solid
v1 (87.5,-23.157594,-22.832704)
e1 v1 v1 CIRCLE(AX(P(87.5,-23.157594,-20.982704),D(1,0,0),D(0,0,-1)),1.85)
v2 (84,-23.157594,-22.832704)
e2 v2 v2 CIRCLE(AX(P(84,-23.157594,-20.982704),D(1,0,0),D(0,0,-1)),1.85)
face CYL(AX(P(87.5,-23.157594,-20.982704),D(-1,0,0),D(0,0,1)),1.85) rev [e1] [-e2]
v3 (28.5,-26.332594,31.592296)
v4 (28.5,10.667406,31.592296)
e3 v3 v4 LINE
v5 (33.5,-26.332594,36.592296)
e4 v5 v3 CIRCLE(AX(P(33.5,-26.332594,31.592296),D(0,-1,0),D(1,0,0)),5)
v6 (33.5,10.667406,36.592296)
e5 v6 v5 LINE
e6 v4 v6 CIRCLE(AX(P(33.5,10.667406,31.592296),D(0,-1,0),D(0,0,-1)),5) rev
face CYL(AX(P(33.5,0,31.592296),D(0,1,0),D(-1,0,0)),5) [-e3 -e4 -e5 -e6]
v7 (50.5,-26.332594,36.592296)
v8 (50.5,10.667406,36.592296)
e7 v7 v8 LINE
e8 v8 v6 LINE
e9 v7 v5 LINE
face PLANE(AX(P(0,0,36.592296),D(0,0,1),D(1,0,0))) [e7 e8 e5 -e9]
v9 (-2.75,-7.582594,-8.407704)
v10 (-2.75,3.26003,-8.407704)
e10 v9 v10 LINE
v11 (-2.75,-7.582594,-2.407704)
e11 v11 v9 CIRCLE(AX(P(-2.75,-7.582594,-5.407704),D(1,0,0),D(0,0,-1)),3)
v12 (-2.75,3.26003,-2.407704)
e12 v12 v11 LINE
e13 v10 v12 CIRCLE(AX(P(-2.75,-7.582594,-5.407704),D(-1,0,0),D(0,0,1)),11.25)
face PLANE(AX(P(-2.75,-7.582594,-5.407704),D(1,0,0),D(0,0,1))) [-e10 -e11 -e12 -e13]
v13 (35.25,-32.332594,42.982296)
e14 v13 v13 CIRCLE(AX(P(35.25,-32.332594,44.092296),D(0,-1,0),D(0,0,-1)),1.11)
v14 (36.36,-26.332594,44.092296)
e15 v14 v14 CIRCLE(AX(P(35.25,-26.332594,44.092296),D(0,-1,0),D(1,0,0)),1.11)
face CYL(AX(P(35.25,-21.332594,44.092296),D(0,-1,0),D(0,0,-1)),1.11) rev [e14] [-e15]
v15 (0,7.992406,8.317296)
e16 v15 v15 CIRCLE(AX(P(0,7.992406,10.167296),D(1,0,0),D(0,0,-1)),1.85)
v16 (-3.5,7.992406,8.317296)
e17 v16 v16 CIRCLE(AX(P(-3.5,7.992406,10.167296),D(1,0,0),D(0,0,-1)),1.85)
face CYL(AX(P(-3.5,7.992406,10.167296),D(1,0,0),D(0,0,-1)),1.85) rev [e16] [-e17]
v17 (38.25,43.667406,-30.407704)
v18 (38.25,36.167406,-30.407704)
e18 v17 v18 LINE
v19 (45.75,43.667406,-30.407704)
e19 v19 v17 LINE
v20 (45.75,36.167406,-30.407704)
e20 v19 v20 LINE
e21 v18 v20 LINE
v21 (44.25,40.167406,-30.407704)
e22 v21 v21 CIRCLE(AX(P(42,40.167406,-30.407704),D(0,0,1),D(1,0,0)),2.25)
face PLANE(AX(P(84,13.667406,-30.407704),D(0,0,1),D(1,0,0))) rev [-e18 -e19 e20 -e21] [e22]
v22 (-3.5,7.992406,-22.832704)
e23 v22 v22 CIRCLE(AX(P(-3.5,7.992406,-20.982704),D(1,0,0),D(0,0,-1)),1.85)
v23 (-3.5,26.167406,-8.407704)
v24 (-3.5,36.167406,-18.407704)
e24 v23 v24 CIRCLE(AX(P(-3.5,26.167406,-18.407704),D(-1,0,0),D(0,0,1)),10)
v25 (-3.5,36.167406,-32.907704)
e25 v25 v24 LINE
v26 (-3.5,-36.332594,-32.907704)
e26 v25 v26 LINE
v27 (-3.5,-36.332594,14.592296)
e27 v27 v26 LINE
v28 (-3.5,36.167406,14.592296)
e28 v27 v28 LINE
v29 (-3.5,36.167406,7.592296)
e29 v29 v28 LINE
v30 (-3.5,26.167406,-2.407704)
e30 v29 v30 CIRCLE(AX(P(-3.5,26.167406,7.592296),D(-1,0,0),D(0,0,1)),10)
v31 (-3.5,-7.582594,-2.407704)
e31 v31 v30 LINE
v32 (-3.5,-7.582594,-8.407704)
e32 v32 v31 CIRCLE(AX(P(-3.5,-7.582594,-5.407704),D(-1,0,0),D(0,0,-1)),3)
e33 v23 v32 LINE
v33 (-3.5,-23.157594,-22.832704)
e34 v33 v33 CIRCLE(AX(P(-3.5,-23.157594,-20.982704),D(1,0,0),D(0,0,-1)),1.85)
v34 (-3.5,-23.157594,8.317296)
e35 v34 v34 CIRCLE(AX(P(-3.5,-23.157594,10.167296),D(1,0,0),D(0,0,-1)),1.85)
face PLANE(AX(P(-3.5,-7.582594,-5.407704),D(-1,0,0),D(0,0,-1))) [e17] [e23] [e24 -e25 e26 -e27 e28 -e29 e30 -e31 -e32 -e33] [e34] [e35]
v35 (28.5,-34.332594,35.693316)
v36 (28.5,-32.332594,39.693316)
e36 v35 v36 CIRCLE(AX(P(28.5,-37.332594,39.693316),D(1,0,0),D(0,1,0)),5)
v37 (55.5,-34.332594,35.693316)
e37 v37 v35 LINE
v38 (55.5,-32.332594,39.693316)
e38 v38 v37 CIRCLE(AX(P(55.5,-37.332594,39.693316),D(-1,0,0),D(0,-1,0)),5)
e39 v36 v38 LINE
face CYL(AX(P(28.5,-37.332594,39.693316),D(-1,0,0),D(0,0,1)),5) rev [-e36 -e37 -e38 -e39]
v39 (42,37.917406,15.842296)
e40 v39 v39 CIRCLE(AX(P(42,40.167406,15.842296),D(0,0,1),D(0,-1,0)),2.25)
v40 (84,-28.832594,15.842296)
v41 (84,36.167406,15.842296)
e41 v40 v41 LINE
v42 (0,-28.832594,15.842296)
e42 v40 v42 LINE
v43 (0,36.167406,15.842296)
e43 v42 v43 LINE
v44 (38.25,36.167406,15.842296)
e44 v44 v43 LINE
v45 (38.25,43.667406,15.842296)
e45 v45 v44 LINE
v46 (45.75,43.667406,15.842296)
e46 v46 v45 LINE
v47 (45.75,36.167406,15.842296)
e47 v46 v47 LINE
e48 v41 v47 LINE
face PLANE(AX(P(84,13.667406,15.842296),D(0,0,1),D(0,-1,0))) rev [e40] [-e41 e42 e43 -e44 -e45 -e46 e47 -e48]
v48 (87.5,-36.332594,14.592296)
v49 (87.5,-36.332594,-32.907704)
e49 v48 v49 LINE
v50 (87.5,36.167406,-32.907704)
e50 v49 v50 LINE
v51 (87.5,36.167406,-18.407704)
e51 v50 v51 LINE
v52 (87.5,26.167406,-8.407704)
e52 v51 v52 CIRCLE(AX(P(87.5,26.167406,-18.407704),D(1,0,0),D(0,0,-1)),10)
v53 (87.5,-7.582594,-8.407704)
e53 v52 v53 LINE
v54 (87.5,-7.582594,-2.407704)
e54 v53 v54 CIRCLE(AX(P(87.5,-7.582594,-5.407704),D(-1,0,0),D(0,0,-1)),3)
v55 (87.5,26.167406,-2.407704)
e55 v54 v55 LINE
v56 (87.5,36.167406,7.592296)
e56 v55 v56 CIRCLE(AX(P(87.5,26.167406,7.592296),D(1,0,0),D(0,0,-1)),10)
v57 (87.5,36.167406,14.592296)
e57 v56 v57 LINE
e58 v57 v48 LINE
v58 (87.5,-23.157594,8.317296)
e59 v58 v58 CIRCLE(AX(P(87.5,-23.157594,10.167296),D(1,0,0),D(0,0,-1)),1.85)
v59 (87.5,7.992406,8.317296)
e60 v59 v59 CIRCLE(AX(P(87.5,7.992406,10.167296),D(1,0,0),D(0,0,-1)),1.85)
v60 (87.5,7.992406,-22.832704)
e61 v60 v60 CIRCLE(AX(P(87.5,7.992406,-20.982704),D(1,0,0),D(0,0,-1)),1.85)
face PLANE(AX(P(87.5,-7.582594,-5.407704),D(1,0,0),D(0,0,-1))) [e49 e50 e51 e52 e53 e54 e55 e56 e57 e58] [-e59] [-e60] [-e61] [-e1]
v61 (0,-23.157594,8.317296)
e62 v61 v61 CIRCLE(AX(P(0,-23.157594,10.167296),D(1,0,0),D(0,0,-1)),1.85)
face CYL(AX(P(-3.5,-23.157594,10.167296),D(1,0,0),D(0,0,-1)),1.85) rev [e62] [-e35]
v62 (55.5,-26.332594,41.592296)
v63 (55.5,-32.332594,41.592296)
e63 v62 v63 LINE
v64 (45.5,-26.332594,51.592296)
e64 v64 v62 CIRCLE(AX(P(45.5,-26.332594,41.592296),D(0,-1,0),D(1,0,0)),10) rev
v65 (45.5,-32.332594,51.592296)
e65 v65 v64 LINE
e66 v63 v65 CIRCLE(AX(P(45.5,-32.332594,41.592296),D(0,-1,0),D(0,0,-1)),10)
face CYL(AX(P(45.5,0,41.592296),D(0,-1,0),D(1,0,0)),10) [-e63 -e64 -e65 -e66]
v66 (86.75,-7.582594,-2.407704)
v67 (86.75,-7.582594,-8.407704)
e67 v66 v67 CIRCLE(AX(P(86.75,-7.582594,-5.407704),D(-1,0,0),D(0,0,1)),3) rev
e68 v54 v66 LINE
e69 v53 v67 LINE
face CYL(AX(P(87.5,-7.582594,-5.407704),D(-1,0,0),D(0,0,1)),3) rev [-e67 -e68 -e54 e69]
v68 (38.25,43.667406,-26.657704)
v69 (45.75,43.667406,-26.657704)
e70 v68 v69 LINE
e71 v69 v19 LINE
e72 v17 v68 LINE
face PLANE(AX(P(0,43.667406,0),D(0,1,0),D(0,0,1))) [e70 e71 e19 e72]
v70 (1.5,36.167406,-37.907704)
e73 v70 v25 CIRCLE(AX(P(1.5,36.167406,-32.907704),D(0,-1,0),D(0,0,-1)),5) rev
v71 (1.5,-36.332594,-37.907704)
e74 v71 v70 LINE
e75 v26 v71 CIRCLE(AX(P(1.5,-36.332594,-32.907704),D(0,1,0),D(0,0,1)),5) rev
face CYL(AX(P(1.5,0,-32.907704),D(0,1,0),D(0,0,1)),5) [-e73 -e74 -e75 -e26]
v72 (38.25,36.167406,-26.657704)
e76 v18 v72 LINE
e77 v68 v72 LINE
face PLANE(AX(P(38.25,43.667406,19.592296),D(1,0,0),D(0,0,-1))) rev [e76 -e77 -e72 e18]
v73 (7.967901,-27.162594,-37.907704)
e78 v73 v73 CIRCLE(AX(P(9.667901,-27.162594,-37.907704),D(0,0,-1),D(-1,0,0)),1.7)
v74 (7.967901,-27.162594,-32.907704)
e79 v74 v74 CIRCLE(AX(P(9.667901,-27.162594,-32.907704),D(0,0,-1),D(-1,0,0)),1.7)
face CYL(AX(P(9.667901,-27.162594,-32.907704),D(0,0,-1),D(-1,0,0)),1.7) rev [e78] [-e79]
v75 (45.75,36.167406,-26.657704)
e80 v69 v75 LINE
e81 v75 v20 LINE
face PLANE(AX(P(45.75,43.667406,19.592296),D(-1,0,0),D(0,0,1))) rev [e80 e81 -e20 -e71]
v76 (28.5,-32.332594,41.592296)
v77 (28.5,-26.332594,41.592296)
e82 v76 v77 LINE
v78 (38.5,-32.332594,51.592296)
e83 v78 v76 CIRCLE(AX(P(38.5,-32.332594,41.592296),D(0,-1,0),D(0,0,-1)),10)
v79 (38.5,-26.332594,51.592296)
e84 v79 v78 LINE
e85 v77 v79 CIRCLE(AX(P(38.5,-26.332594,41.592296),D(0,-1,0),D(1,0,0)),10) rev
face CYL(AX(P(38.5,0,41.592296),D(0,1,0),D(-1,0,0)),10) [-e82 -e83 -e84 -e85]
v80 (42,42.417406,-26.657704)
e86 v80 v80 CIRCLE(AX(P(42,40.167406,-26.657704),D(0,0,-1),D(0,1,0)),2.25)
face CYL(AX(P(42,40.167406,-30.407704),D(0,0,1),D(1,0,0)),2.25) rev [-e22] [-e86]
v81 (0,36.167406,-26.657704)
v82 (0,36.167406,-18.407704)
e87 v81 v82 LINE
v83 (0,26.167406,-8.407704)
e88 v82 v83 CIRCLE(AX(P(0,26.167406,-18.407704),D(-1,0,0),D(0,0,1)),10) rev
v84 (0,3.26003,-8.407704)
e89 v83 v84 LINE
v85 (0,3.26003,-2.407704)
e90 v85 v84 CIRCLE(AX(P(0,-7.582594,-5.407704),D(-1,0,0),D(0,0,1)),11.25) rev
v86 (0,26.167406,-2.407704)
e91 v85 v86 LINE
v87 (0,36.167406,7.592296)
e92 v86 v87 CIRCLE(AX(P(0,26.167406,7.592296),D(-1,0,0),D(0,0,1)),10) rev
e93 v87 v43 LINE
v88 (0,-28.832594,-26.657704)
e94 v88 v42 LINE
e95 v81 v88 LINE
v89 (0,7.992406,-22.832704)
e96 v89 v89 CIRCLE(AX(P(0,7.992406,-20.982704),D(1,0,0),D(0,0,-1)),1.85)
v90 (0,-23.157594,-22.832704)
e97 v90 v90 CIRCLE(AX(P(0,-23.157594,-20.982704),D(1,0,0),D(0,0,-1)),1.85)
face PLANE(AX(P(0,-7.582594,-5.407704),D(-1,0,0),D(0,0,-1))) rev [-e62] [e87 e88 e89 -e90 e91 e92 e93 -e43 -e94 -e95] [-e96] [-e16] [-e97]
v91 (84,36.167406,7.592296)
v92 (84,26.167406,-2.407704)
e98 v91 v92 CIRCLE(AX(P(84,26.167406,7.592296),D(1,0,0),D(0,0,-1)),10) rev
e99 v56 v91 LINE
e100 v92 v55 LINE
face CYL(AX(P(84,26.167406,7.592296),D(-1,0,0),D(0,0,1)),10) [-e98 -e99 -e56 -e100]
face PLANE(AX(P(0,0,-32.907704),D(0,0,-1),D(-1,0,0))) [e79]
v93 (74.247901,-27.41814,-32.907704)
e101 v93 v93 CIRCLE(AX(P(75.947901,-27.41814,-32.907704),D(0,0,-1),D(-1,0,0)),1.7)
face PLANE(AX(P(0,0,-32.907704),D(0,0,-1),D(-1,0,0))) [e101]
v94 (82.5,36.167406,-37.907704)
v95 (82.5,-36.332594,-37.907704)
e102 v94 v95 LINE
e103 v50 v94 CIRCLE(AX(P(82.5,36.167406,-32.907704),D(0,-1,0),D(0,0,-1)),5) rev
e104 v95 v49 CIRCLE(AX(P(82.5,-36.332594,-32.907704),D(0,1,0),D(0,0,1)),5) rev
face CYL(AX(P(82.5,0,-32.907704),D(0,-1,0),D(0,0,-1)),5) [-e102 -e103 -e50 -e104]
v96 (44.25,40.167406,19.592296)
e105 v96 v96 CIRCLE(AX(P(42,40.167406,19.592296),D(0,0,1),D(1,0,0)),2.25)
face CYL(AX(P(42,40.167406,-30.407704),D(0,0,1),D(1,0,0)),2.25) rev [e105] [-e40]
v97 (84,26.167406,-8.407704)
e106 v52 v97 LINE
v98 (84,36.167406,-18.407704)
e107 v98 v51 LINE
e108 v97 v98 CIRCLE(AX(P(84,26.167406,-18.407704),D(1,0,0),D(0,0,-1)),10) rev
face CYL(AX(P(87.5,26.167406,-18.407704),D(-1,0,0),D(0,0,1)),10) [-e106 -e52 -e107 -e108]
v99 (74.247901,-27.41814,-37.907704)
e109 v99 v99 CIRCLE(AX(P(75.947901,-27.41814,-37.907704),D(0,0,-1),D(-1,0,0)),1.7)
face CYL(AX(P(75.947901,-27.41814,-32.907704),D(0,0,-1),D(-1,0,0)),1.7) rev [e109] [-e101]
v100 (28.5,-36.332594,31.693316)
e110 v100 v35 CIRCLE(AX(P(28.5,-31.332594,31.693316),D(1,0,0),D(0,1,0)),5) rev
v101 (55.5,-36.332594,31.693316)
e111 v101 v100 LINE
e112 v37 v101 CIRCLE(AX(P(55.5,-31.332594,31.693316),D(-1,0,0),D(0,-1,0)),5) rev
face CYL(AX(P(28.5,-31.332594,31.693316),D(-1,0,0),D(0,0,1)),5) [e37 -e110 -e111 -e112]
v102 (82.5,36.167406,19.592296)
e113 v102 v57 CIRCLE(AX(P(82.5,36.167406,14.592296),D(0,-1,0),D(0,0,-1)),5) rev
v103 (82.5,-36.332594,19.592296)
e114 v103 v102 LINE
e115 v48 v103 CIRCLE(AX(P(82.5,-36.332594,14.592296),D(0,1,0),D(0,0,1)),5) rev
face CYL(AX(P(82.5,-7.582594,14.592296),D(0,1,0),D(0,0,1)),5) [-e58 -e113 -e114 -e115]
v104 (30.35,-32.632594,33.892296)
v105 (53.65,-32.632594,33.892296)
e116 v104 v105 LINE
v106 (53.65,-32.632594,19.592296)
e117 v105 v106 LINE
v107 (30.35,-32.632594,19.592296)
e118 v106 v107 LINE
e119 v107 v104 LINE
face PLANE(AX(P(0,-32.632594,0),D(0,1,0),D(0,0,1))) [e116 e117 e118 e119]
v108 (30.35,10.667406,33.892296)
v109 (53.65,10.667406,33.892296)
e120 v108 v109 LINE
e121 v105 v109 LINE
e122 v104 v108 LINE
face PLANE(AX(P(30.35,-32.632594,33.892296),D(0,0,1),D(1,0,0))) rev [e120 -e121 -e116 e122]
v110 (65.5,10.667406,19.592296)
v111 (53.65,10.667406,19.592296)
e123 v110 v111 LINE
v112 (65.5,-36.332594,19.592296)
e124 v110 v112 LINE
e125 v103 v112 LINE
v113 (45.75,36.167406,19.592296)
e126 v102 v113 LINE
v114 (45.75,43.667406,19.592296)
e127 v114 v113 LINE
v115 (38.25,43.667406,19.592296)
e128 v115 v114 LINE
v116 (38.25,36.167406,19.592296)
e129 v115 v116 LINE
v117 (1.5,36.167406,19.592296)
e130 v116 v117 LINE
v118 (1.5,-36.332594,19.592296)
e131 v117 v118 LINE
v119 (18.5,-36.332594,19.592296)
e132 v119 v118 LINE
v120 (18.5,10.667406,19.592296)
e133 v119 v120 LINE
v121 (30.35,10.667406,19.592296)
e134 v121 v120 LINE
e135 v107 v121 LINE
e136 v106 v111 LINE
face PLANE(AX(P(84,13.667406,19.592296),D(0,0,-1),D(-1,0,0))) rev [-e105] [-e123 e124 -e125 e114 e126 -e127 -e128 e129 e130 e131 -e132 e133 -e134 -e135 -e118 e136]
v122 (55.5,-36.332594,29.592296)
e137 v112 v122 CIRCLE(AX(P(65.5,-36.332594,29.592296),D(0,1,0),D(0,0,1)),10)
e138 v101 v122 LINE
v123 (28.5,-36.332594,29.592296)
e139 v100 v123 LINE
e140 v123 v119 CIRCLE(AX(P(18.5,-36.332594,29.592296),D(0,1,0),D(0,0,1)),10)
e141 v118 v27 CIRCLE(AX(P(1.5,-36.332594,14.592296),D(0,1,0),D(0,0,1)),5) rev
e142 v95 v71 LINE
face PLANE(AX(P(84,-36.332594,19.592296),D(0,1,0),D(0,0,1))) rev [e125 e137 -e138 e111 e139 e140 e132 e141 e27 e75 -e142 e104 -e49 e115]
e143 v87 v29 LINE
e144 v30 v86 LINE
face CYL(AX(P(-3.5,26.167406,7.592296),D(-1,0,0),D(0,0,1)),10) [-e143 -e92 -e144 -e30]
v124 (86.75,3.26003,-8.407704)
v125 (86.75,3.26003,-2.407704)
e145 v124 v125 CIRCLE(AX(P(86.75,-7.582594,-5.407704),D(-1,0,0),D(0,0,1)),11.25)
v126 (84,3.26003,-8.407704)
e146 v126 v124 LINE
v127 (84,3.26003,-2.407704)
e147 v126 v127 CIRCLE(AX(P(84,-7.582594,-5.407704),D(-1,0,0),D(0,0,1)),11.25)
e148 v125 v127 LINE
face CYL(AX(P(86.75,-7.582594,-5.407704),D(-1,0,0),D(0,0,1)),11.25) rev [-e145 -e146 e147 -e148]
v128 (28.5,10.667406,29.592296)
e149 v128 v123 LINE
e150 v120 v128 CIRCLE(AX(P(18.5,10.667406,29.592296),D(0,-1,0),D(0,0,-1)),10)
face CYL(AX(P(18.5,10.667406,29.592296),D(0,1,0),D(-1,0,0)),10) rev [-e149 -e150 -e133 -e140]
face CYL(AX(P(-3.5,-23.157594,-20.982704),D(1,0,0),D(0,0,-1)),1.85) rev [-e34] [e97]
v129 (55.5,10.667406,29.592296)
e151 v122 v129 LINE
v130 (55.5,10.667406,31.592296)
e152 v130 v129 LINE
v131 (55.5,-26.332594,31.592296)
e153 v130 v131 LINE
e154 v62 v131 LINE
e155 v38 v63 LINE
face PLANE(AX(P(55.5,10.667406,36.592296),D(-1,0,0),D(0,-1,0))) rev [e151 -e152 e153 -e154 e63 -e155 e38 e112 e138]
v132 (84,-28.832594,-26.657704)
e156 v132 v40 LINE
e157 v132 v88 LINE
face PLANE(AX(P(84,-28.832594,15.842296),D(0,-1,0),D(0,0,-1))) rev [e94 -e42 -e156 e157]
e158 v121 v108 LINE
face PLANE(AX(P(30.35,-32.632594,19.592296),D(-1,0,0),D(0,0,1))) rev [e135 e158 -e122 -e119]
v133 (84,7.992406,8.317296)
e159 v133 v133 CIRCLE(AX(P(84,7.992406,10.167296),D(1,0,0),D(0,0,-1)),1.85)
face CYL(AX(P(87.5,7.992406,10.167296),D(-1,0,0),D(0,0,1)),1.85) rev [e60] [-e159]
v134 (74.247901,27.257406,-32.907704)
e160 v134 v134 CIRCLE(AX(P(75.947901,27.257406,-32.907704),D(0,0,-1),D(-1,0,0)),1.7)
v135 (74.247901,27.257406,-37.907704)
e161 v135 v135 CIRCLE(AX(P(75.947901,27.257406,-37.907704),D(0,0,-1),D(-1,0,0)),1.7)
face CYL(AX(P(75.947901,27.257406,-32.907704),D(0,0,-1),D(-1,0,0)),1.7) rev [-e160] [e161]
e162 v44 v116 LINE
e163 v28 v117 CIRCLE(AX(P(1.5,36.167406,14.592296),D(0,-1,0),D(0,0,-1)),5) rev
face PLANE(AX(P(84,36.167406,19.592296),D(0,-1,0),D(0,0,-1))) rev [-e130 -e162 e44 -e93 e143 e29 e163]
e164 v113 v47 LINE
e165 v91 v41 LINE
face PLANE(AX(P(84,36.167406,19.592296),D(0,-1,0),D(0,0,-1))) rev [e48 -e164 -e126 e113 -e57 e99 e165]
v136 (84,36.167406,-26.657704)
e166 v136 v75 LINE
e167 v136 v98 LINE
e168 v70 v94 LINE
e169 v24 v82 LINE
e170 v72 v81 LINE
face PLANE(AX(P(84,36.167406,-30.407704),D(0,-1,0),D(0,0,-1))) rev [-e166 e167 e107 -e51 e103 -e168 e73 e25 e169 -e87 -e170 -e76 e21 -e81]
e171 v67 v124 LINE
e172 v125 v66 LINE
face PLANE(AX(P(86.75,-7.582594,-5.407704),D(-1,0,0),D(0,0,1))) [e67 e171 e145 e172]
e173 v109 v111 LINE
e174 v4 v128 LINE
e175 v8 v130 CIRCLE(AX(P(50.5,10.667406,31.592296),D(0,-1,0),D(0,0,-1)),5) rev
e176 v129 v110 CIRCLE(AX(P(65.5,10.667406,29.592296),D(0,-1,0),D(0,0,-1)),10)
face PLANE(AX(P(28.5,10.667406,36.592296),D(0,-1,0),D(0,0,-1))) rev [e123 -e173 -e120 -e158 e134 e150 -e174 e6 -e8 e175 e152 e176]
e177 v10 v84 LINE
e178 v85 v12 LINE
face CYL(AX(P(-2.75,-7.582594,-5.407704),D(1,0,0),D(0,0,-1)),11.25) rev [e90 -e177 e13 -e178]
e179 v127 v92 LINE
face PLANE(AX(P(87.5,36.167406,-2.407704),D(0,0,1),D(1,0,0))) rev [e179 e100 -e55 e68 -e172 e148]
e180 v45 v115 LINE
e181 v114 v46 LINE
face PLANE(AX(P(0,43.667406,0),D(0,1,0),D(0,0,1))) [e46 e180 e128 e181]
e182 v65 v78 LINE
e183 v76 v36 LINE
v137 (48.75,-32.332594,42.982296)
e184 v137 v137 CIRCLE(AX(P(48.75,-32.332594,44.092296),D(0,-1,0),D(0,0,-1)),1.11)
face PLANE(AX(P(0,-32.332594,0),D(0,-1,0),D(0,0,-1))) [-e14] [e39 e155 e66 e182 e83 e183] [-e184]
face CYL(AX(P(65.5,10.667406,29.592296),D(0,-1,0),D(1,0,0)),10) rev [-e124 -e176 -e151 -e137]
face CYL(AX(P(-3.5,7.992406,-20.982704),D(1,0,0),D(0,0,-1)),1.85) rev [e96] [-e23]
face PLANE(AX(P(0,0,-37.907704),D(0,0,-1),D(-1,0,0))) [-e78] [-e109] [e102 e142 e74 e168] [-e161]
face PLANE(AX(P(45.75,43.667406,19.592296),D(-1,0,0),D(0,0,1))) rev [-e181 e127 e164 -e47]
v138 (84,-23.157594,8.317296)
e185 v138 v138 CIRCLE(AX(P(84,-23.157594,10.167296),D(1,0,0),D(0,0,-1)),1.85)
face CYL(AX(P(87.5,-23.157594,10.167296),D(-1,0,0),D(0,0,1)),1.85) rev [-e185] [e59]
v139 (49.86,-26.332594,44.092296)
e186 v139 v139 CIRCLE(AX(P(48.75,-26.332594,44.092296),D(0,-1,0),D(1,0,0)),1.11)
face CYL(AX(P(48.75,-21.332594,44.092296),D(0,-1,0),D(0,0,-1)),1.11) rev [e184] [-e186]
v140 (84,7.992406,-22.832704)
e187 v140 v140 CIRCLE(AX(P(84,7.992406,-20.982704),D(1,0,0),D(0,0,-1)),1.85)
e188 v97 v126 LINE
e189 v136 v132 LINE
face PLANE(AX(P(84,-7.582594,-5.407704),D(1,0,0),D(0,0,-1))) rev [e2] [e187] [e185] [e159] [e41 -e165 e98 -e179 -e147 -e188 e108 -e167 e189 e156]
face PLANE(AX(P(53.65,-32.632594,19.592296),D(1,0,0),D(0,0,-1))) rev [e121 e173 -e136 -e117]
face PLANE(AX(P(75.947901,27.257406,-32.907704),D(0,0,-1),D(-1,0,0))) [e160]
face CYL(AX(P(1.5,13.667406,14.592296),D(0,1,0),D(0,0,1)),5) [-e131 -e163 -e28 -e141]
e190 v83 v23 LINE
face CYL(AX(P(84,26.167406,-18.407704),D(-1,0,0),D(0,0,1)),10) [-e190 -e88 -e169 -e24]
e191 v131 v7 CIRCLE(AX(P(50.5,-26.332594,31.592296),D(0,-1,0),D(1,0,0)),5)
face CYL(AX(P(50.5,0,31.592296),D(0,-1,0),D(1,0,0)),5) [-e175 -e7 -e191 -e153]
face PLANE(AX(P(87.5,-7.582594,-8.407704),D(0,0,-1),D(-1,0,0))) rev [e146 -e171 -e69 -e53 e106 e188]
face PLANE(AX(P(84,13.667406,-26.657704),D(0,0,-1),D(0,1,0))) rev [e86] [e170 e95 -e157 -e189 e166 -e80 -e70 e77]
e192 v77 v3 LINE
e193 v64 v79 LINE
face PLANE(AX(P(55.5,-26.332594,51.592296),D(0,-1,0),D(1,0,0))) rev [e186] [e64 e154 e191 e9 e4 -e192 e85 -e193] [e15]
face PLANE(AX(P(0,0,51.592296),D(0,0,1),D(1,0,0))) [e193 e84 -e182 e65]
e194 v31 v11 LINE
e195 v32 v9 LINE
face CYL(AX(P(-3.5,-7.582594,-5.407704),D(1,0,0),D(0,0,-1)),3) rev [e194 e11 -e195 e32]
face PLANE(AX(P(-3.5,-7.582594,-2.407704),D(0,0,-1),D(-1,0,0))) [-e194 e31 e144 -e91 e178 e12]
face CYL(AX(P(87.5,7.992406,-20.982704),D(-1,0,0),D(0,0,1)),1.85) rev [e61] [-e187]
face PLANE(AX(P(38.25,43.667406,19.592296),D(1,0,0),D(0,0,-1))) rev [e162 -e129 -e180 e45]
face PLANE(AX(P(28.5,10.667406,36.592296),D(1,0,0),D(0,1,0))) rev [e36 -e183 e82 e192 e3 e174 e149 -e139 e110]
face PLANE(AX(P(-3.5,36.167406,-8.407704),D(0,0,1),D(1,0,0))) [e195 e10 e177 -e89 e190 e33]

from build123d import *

# Parameters (mm, degrees)
BOSS_EXTRU_1_DEPTH       = 84
ESQUISSE6_W              = 27
ESQUISSE6_H              = 47
BOSS_EXTRU_3_DEPTH       = 17
ESQUISSE7_W              = 23.3
ESQUISSE7_H              = 14.3
ENL_V_MAT_EXTRU_4_DEPTH  = 43.3
ESQUISSE8_R              = 1.85
BOSS_EXTRU_4_DEPTH       = 3.5
ESQUISSE12_R             = 11.25
ENL_V_MAT_EXTRU_7_DEPTH  = 2.75
ESQUISSE13_W             = 27
ESQUISSE13_H             = 10
BOSS_EXTRU_5_DEPTH       = 15
ESQUISSE15_W             = 27
ESQUISSE15_H             = 15
ENL_V_MAT_EXTRU_9_DEPTH  = 4
ESQUISSE14_R             = 1.11
ENL_V_MAT_EXTRU_8_DEPTH  = 15
CONG_6_R                 = 5
CONG_7_R                 = 5
CONG_1_R                 = 10
CONG_2_R                 = 10
CONG_3_R                 = 10
CONG_4_R                 = 5
CONG_8_R                 = 5
BOSS_EXTRU_6_DEPTH       = 7.5
ESQUISSE17_R             = 2.25
ENL_V_MAT_EXTRU_10_DEPTH = 110.832109883
ESQUISSE20_W             = 91
ESQUISSE20_H             = 72.5
BOSS_EXTRU_7_DEPTH       = 7.5
ESQUISSE21_R             = 1.7
ESQUISSE21_R_2           = 1.699999999
ENL_V_MAT_EXTRU_11_DEPTH = 5
CONG_9_R                 = 5


with BuildPart() as part:
    # Esquisse1 → Boss.-Extru.1 (new body)
    with BuildSketch(Plane(origin=(0, 0, 0), x_dir=(0, 0, -1), z_dir=(1, 0, 0))):
        Polygon((-15.842295968, 13.667406166), (-15.842295968, -28.832593834), (26.657704032, -28.832593834), (26.657704032, 13.667406166), (26.657704032, 36.167406166), (30.407704032, 36.167406166), (30.407704032, 13.667406166), (30.407704032, -36.332593834), (-19.592295968, -36.332593834), (-19.592295968, 13.667406166), (-19.592295968, 36.167406166), (-15.842295968, 36.167406166), align=None)
    extrude(amount=BOSS_EXTRU_1_DEPTH)

    # Esquisse6 → Boss.-Extru.3 (add)
    with BuildSketch(Plane.XY.offset(19.592295968)):
        with Locations((42, -12.832593834)):
            Rectangle(ESQUISSE6_W, ESQUISSE6_H)
    extrude(amount=BOSS_EXTRU_3_DEPTH)

    # Esquisse7 → Enlèv. mat.-Extru.4 (cut)
    with BuildSketch(Plane(origin=(0, 10.667406166, 0), x_dir=(1, 0, 0), z_dir=(0, 1, 0))):
        with Locations((42, -26.742295968)):
            Rectangle(ESQUISSE7_W, ESQUISSE7_H)
    extrude(amount=-ENL_V_MAT_EXTRU_4_DEPTH, mode=Mode.SUBTRACT)

    # Esquisse8 → Boss.-Extru.4 (add)
    with BuildSketch(Plane(origin=(84, 0, 0), x_dir=(0, 0, -1), z_dir=(1, 0, 0))):
        with BuildLine():
            Line((-19.592295968, -36.332593834), (30.407704032, -36.332593834))
            Line((30.407704032, -36.332593834), (30.407704032, 13.667406166))
            Line((30.407704032, 13.667406166), (30.407704032, 36.167406166))
            Line((30.407704032, 36.167406166), (8.407704032, 36.167406166))
            Line((8.407704032, 36.167406166), (8.407704032, 13.667406166))
            Line((8.407704032, 13.667406166), (8.407704032, -7.582593834))
            ThreePointArc((8.407704032, -7.582593834), (5.407704032, -10.582593834), (2.407704032, -7.582593834))
            Line((2.407704032, -7.582593834), (2.407704032, 13.667406166))
            Line((2.407704032, 13.667406166), (2.407704032, 36.167406166))
            Line((2.407704032, 36.167406166), (-19.592295968, 36.167406166))
            Line((-19.592295968, 36.167406166), (-19.592295968, 13.667406166))
            Line((-19.592295968, 13.667406166), (-19.592295968, -36.332593834))
        make_face()
        with Locations((-10.167295968, 7.992406166)):
            Circle(ESQUISSE8_R, mode=Mode.SUBTRACT)
        with Locations((20.982704032, 7.992406166)):
            Circle(ESQUISSE8_R, mode=Mode.SUBTRACT)
        with Locations((20.982704032, -23.157593834)):
            Circle(ESQUISSE8_R, mode=Mode.SUBTRACT)
        with Locations((-10.167295968, -23.157593834)):
            Circle(ESQUISSE8_R, mode=Mode.SUBTRACT)
    boss_extru_4 = extrude(amount=BOSS_EXTRU_4_DEPTH)

    # Esquisse12 → Enlèv. mat.-Extru.7 (cut)
    with BuildSketch(Plane.ZY.offset(-84)):
        with Locations((-5.407704032, -7.582593834)):
            Circle(ESQUISSE12_R)
    enl_v_mat_extru_7 = extrude(amount=-ENL_V_MAT_EXTRU_7_DEPTH, mode=Mode.SUBTRACT)

    # Symétrie1: Boss.-Extru.4, Enlèv. mat.-Extru.7 across plane
    add(boss_extru_4.mirror(Plane.ZY.offset(-42)))
    add(enl_v_mat_extru_7.mirror(Plane.ZY.offset(-42)), mode=Mode.SUBTRACT)

    # Esquisse13 → Boss.-Extru.5 (add)
    with BuildSketch(Plane.XY.offset(36.592295968)):
        with Locations((42, -31.332593834)):
            Rectangle(ESQUISSE13_W, ESQUISSE13_H)
    extrude(amount=BOSS_EXTRU_5_DEPTH)

    # Esquisse15 → Enlèv. mat.-Extru.9 (cut)
    with BuildSketch(Plane.XZ.offset(36.332593834)):
        with Locations((42, 44.092295968)):
            Rectangle(ESQUISSE15_W, ESQUISSE15_H)
    extrude(amount=-ENL_V_MAT_EXTRU_9_DEPTH, mode=Mode.SUBTRACT)

    # Esquisse14 → Enlèv. mat.-Extru.8 (cut)
    with BuildSketch(Plane.XZ.offset(36.332593834)):
        with Locations(Location((35.25, 44.092295968, 0), (0, 0, 270))):
            Circle(ESQUISSE14_R)
        with Locations(Location((48.75, 44.092295968, 0), (0, 0, 270))):
            Circle(ESQUISSE14_R)
    extrude(amount=-ENL_V_MAT_EXTRU_8_DEPTH, mode=Mode.SUBTRACT)

    # Congé6
    # the kernel refuses this fillet: 5 mm, written as the material it takes off along each edge
    with BuildSketch(Plane(origin=(67.747448714, -36.332593834, 36.592295968), x_dir=(0, 0, -1), z_dir=(-1, 0, 0))) as cong_6_piece_1:
        with BuildLine():
            CenterArc((4.898979486, -5), CONG_6_R, 90, 78.463040967)
            Line((0, -4), (-0.09797959, -3.98))
            ThreePointArc((-0.09797959, -3.98), (-0.1, -2), (-0.1, 0))
            Line((-0.1, 0), (0, 0.1))
            Line((0, 0.1), (4.898979486, 0.1))
            Line((4.898979486, 0.1), (4.898979486, 0))
        make_face()
    extrude(amount=51.494897428, mode=Mode.SUBTRACT)

    # Congé7
    cong_7_edges = [part.edges().sort_by_distance(p)[0] for p in [
        (42, -32.332593834, 36.592295968),
    ]]
    fillet(cong_7_edges, radius=CONG_7_R)

    # Congé1
    cong_1_edges = [part.edges().sort_by_distance(p)[0] for p in [
        (28.5, -29.332593834, 51.592295968),
        (55.5, -29.332593834, 51.592295968),
    ]]
    fillet(cong_1_edges, radius=CONG_1_R)

    # Congé2
    cong_2_edges = [part.edges().sort_by_distance(p)[0] for p in [
        (-1.75, 36.167406166, -8.407704032),
        (-1.75, 36.167406166, -2.407704032),
        (85.75, 36.167406166, -2.407704032),
        (85.75, 36.167406166, -8.407704032),
    ]]
    fillet(cong_2_edges, radius=CONG_2_R)

    # Congé3
    cong_3_edges = [part.edges().sort_by_distance(p)[0] for p in [
        (28.5, -12.832593834, 19.592295968),
        (55.5, -12.832593834, 19.592295968),
    ]]
    fillet(cong_3_edges, radius=CONG_3_R)

    # Congé4
    cong_4_edges = [part.edges().sort_by_distance(p)[0] for p in [
        (-3.5, -0.082593834, 19.592295968),
        (87.5, -0.082593834, 19.592295968),
    ]]
    fillet(cong_4_edges, radius=CONG_4_R)

    # Congé8
    cong_8_edges = [part.edges().sort_by_distance(p)[0] for p in [
        (55.5, -7.832593834, 36.592295968),
        (28.5, -7.832593834, 36.592295968),
    ]]
    fillet(cong_8_edges, radius=CONG_8_R)

    # Esquisse16 → Boss.-Extru.6 (add)
    with BuildSketch(Plane(origin=(0, 36.167406166, 0), x_dir=(1, 0, 0), z_dir=(0, 1, 0))):
        Polygon((39.5, -15.842295968), (44.5, -15.842295968), (45.75, -15.842295968), (45.75, -19.592295968), (44.5, -19.592295968), (39.5, -19.592295968), (38.25, -19.592295968), (38.25, -15.842295968), align=None)
        Polygon((39.5, 26.657704032), (38.25, 26.657704032), (38.25, 30.407704032), (39.5, 30.407704032), (44.5, 30.407704032), (45.75, 30.407704032), (45.75, 26.657704032), (44.5, 26.657704032), align=None)
    extrude(amount=BOSS_EXTRU_6_DEPTH)

    # Esquisse17 → Enlèv. mat.-Extru.10 (cut, through all)
    with BuildSketch(Plane.XY.offset(19.592295968)):
        with Locations((42, 40.167406166)):
            Circle(ESQUISSE17_R)
    extrude(amount=-ENL_V_MAT_EXTRU_10_DEPTH, mode=Mode.SUBTRACT)

    # Esquisse20 → Boss.-Extru.7 (add)
    with BuildSketch(Plane(origin=(0, 0, -30.407704032), x_dir=(-1, 0, 0), z_dir=(0, 0, -1))):
        with Locations((-42, -0.082593834)):
            Rectangle(ESQUISSE20_W, ESQUISSE20_H)
    extrude(amount=BOSS_EXTRU_7_DEPTH)

    # Esquisse21 → Enlèv. mat.-Extru.11 (cut)
    with BuildSketch(Plane(origin=(0, 0, -37.907704032), x_dir=(-1, 0, 0), z_dir=(0, 0, -1))):
        with Locations((-75.947901314, -27.418139831)):
            Circle(ESQUISSE21_R)
        with Locations((-9.667901314, -27.162593831)):
            Circle(ESQUISSE21_R_2)
        with Locations((-75.947901314, 27.257406166)):
            Circle(ESQUISSE21_R)
    extrude(amount=-ENL_V_MAT_EXTRU_11_DEPTH, mode=Mode.SUBTRACT)

    # Congé9
    cong_9_edges = [part.edges().sort_by_distance(p)[0] for p in [
        (87.5, -0.082593834, -37.907704032),
        (-3.5, -0.082593834, -37.907704032),
    ]]
    fillet(cong_9_edges, radius=CONG_9_R)


solid = part.part
